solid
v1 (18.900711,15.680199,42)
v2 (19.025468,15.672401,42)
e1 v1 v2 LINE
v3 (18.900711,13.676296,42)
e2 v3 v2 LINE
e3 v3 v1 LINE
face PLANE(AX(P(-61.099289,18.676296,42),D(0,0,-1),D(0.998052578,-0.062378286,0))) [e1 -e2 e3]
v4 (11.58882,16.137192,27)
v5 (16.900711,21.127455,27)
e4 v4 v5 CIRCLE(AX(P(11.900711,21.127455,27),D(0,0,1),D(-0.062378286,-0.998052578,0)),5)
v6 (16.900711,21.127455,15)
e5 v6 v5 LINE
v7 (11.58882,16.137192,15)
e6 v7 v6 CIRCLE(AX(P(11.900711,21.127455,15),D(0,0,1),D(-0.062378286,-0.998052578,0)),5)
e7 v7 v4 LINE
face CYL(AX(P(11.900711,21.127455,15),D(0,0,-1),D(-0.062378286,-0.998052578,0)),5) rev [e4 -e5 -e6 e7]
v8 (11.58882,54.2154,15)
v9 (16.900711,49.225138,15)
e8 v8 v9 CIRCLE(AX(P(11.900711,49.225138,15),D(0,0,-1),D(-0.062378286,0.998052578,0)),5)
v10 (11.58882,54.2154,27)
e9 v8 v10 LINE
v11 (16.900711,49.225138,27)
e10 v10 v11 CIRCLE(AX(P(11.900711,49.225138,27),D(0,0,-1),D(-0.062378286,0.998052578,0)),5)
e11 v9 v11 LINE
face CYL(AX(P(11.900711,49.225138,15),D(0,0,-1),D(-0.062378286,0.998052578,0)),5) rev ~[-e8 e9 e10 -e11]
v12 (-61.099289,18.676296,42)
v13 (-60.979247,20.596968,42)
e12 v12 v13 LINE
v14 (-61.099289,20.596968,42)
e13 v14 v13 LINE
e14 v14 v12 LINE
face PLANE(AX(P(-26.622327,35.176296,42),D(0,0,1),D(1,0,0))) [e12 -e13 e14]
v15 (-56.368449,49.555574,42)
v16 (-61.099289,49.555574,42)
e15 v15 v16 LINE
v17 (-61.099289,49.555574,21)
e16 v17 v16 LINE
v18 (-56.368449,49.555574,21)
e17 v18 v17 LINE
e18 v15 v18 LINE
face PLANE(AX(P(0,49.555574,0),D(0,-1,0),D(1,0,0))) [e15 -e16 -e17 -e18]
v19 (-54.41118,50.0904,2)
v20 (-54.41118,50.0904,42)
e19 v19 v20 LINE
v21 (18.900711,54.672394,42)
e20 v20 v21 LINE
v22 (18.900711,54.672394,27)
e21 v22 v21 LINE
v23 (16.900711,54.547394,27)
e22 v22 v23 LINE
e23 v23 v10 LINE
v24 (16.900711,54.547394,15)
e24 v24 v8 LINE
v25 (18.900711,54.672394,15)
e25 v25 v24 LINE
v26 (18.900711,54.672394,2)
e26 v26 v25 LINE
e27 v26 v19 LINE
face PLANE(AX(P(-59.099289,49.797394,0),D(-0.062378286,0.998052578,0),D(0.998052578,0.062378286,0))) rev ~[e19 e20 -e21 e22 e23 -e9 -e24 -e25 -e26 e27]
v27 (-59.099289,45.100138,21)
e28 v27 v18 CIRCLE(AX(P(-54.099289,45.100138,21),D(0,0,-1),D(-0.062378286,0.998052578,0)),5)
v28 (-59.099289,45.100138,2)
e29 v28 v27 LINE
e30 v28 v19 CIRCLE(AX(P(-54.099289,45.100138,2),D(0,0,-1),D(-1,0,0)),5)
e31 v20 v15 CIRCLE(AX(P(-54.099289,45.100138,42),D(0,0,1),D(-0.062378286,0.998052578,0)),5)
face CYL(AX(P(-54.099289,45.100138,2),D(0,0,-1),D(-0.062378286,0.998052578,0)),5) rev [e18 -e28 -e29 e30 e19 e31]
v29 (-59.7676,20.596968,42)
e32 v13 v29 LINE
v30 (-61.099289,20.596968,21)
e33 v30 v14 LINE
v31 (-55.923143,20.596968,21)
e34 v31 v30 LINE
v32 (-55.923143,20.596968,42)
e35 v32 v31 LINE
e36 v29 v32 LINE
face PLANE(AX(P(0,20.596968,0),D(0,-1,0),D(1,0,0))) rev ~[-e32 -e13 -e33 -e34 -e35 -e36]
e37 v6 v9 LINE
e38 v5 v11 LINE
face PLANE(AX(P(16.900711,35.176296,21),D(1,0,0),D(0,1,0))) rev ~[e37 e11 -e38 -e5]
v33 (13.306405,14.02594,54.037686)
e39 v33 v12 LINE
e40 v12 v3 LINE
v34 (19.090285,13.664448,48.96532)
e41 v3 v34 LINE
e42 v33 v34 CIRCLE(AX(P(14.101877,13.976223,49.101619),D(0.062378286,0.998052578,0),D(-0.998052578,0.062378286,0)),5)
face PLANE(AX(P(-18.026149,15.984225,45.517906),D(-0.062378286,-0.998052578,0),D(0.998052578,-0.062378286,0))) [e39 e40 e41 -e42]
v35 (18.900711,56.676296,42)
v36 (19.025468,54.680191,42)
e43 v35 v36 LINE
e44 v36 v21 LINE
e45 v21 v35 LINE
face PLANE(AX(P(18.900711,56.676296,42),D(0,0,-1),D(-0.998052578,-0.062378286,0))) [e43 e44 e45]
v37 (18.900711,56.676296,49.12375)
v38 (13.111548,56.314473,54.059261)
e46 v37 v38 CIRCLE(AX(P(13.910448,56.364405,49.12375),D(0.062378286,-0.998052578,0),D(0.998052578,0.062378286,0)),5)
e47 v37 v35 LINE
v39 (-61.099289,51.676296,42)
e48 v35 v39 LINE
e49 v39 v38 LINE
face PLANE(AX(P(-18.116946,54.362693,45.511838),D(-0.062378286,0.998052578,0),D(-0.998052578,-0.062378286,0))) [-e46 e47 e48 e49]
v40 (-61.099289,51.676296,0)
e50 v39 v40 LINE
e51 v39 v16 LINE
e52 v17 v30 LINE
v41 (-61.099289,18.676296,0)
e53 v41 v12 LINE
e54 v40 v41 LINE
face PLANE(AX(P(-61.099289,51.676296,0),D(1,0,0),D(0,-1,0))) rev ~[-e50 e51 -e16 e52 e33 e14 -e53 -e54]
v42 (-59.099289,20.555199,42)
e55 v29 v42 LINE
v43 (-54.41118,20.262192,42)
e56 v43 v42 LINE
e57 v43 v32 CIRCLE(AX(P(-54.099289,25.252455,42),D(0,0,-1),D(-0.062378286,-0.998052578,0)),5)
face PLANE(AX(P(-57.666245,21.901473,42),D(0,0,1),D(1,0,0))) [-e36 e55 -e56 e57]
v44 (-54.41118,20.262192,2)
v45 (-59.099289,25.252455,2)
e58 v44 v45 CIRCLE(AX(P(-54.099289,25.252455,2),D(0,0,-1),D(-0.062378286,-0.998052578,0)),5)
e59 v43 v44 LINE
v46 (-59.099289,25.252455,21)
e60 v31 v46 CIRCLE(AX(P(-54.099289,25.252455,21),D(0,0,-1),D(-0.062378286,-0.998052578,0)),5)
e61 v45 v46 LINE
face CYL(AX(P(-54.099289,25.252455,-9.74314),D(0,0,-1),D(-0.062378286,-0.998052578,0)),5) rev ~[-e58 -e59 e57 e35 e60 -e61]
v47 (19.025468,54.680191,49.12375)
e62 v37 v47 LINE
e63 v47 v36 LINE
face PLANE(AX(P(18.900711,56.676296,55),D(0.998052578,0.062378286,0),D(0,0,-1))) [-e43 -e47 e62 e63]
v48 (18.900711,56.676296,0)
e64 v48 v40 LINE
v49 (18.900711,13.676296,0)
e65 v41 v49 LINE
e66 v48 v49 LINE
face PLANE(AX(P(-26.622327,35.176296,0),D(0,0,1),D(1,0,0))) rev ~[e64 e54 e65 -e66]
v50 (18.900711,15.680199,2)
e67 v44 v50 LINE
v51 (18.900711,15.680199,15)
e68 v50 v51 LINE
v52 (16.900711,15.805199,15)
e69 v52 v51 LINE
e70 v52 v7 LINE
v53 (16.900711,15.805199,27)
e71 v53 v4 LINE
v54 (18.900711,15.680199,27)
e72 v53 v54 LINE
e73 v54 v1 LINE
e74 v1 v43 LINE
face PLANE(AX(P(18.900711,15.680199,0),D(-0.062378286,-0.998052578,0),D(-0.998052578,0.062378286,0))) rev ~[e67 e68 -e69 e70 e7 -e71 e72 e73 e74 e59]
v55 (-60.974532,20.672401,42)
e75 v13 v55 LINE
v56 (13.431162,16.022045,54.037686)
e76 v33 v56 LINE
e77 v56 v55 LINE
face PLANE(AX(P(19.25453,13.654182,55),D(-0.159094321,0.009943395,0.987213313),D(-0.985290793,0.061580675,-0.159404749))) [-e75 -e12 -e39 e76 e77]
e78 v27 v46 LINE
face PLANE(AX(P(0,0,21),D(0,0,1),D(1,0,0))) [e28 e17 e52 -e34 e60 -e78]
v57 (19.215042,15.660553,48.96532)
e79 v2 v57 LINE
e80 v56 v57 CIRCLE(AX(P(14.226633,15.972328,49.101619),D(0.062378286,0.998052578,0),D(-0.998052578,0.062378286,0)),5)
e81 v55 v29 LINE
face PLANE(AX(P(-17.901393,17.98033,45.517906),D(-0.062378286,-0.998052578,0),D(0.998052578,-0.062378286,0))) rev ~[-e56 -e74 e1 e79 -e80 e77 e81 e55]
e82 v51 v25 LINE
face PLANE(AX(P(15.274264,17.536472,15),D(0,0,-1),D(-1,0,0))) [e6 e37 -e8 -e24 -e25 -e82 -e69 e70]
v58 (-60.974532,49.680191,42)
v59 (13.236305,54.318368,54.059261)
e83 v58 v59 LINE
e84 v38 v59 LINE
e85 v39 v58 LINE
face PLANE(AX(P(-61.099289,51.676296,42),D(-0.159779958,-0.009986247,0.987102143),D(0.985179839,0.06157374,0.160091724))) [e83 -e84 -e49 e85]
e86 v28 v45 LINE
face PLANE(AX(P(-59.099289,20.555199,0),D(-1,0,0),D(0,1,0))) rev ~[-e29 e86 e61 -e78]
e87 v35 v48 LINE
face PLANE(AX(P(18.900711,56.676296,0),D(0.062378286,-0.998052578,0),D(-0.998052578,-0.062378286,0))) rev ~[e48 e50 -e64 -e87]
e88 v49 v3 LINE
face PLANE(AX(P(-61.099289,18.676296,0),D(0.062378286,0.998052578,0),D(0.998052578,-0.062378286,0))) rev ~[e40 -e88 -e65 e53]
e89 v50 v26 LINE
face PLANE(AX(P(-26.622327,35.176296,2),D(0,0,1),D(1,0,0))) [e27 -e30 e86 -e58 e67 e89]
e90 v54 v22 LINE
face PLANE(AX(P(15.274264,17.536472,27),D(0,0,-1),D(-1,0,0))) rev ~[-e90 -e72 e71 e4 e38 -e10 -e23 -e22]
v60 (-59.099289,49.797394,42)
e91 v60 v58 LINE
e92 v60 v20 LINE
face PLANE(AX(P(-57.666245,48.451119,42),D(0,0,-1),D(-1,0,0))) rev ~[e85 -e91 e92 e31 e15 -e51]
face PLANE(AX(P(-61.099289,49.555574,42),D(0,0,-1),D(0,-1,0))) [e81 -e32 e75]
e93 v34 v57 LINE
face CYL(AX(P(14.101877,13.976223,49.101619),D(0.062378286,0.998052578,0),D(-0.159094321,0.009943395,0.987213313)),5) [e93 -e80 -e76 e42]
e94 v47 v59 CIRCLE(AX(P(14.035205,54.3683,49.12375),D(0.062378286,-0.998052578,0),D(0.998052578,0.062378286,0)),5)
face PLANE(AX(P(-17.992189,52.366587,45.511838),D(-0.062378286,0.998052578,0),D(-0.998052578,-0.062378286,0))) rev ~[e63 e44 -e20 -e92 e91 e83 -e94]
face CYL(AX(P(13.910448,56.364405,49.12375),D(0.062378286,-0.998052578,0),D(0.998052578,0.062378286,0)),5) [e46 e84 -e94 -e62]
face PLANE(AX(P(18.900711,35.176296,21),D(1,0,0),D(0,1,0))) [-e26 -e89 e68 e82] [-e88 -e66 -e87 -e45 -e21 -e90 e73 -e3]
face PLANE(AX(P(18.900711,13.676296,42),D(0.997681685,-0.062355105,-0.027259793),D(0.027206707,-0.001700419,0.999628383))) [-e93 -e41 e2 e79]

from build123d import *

# Parameters (mm, degrees)
F1_DEPTH      = 2
F2_DEPTH      = 42
F5_DEPTH      = 2
F7_DEPTH      = 2
F8_W          = 28.9586056024
F8_H          = 21
F9_DEPTH      = 25
F10_W         = 38.9921951145
F10_H         = 12
F11_DEPTH     = 2
F12_T1_DEPTH  = 12
F12_T6_DEPTH  = 51.7431402671
F12_T11_DEPTH = 51.7431402671
F12_T17_DEPTH = 40
F12_T22_DEPTH = 51.7431402671
F13_R         = 5


# Not quite as in the source:
# - a fillet or chamfer that OpenCascade refuses, or shapes differently, is made with other operations: its cross-section is extruded or revolved along the edge and cut away or added


with BuildPart() as f1:
    # F0 (on Top) → F1 (new body)
    with BuildSketch(Plane.XY):
        Polygon((16.9007111498, 56.5512960928), (-61.0992888502, 51.6762960928), (-61.0992888502, 18.6762960928), (16.9007111498, 13.8012960928), (18.9007111498, 13.6762960928), (18.9007111498, 15.6801985355), (16.9007111498, 15.8051985355), (-59.0992888502, 20.5551985355), (-59.0992888502, 49.79739365), (16.9007111498, 54.54739365), (18.9007111498, 54.67239365), (18.9007111498, 56.6762960928), align=None)
        Polygon((18.9007111498, 15.6801985355), (18.9007111498, 54.67239365), (16.9007111498, 54.54739365), (16.9007111498, 15.8051985355), align=None)
        Polygon((16.9007111498, 15.8051985355), (16.9007111498, 54.54739365), (-59.0992888502, 49.79739365), (-59.0992888502, 20.5551985355), align=None)
    extrude(amount=F1_DEPTH)

    # F0 (on Top) → F2 (join)
    with BuildSketch(Plane.XY):
        Polygon((16.9007111498, 56.5512960928), (-61.0992888502, 51.6762960928), (-61.0992888502, 18.6762960928), (16.9007111498, 13.8012960928), (18.9007111498, 13.6762960928), (18.9007111498, 15.6801985355), (16.9007111498, 15.8051985355), (-59.0992888502, 20.5551985355), (-59.0992888502, 49.79739365), (16.9007111498, 54.54739365), (18.9007111498, 54.67239365), (18.9007111498, 56.6762960928), align=None)
    extrude(amount=F2_DEPTH)

    # F3 (on face) → F5 (join)
    with BuildSketch(Plane(origin=(0.9249861815, 14.7997789033, 0), x_dir=(0.9980525785, -0.0623782862, 0), z_dir=(-0.0623782862, -0.9980525785, 0))):
        Polygon((18.3653086424, 55), (-62.1452981224, 42), (18.010799587, 42), align=None)
    extrude(amount=-F5_DEPTH)

    # F6 (on face) → F7 (join)
    with BuildSketch(Plane(origin=(-3.4549417367, 55.2790677874, 0), x_dir=(-0.9980525785, -0.0623782862, 0), z_dir=(-0.0623782862, 0.9980525785, 0))):
        Polygon((-22.3992737141, 55), (-22.3992737141, 42), (57.7568239953, 42), align=None)
    extrude(amount=-F7_DEPTH)

    # F8 (on face) → F9 (cut)
    with BuildSketch(Plane(origin=(-61.0992888502, 0, 0), x_dir=(0, -1, 0), z_dir=(-1, 0, 0))):
        with Locations((-35.0762708113, 31.5)):
            Rectangle(F8_W, F8_H)
    extrude(amount=-F9_DEPTH, mode=Mode.SUBTRACT)

    # F10 (on face) → F11 (join)
    with BuildSketch(Plane.YZ.offset(18.9007111498)):
        with Locations((35.1762960928, 21)):
            Rectangle(F10_W, F10_H)
    extrude(amount=-F11_DEPTH)

    # F12: fillet of radius 5 on 4 edges, made by hand

    # F12_s2 → F12_t1 (join)
    with BuildSketch(Plane.XY.offset(15)):
        with BuildLine():
            ThreePointArc((11.588819719, 16.1371917499), (15.324199345, 17.4833184516), (16.9007111498, 21.1274546423))
            Line((16.9007111498, 21.1274546423), (16.9007111498, 15.8051985355))
            Line((16.9007111498, 15.8051985355), (11.588819719, 16.1371917499))
        make_face()
        with BuildLine():
            ThreePointArc((11.588819719, 54.2154004356), (15.324199345, 52.869273734), (16.9007111498, 49.2251375432))
            Line((16.9007111498, 49.2251375432), (16.9007111498, 54.54739365))
            Line((16.9007111498, 54.54739365), (11.588819719, 54.2154004356))
        make_face()
    extrude(amount=F12_T1_DEPTH)


with BuildPart() as f12_tool4:
    # F12_s5 → F12_t6 (new body)
    with BuildSketch(Plane.XY.offset(2)):
        with BuildLine():
            ThreePointArc((-54.411180281, 20.2621917499), (-57.743425041, 21.8289664471), (-59.0992888502, 25.2524546423))
            Line((-59.0992888502, 25.2524546423), (-59.0992888502, 20.5551985355))
            Line((-59.0992888502, 20.5551985355), (-54.411180281, 20.2621917499))
        make_face()
    extrude(amount=F12_T6_DEPTH)

    split(bisect_by=Plane.XY.offset(21), keep=Keep.BOTTOM)


with BuildPart() as f1_1:
    add(f1.part)

    # F12_t3: union F12_tool4
    add(f12_tool4.part)


with BuildPart() as f12_tool9:
    # F12_s10 → F12_t11 (new body)
    with BuildSketch(Plane.XY.offset(-9.7431402671)):
        with BuildLine():
            ThreePointArc((-54.411180281, 20.2621917499), (-57.743425041, 21.8289664471), (-59.0992888502, 25.2524546423))
            Line((-59.0992888502, 25.2524546423), (-59.0992888502, 20.5551985355))
            Line((-59.0992888502, 20.5551985355), (-54.411180281, 20.2621917499))
        make_face()
    extrude(amount=F12_T11_DEPTH)

    split(bisect_by=Plane.XZ.offset(-20.5969680101), keep=Keep.TOP)

    split(bisect_by=Plane.XY.offset(21), keep=Keep.TOP)


with BuildPart() as f1_2:
    add(f1_1.part)

    # F12_t8: union F12_tool9
    add(f12_tool9.part)


with BuildPart() as f12_tool15:
    # F12_s16 → F12_t17 (new body)
    with BuildSketch(Plane.XY.offset(2)):
        with BuildLine():
            ThreePointArc((-54.411180281, 50.0904004356), (-57.743425041, 48.5236257384), (-59.0992888502, 45.1001375432))
            Line((-59.0992888502, 45.1001375432), (-59.0992888502, 49.79739365))
            Line((-59.0992888502, 49.79739365), (-54.411180281, 50.0904004356))
        make_face()
    extrude(amount=F12_T17_DEPTH)

    split(bisect_by=Plane.XZ.offset(-49.5555736125), keep=Keep.BOTTOM)


with BuildPart() as f1_3:
    add(f1_2.part)

    # F12_t14: union F12_tool15
    add(f12_tool15.part)


with BuildPart() as f12_tool20:
    # F12_s21 → F12_t22 (new body)
    with BuildSketch(Plane.XY.offset(2)):
        with BuildLine():
            ThreePointArc((-54.411180281, 50.0904004356), (-57.743425041, 48.5236257384), (-59.0992888502, 45.1001375432))
            Line((-59.0992888502, 45.1001375432), (-59.0992888502, 49.79739365))
            Line((-59.0992888502, 49.79739365), (-54.411180281, 50.0904004356))
        make_face()
    extrude(amount=F12_T22_DEPTH)

    split(bisect_by=Plane.XY.offset(21), keep=Keep.BOTTOM)


with BuildPart() as f1_4:
    add(f1_3.part)

    # F12_t19: union F12_tool20
    add(f12_tool20.part)

    # F13
    f13_edges = [f1_4.edges().sort_by_distance(p)[0] for p in [
        (18.963089, 55.678244, 55),
        (19.316908, 14.652235, 55),
    ]]
    fillet(f13_edges, radius=F13_R)


solid = f1_4.part
